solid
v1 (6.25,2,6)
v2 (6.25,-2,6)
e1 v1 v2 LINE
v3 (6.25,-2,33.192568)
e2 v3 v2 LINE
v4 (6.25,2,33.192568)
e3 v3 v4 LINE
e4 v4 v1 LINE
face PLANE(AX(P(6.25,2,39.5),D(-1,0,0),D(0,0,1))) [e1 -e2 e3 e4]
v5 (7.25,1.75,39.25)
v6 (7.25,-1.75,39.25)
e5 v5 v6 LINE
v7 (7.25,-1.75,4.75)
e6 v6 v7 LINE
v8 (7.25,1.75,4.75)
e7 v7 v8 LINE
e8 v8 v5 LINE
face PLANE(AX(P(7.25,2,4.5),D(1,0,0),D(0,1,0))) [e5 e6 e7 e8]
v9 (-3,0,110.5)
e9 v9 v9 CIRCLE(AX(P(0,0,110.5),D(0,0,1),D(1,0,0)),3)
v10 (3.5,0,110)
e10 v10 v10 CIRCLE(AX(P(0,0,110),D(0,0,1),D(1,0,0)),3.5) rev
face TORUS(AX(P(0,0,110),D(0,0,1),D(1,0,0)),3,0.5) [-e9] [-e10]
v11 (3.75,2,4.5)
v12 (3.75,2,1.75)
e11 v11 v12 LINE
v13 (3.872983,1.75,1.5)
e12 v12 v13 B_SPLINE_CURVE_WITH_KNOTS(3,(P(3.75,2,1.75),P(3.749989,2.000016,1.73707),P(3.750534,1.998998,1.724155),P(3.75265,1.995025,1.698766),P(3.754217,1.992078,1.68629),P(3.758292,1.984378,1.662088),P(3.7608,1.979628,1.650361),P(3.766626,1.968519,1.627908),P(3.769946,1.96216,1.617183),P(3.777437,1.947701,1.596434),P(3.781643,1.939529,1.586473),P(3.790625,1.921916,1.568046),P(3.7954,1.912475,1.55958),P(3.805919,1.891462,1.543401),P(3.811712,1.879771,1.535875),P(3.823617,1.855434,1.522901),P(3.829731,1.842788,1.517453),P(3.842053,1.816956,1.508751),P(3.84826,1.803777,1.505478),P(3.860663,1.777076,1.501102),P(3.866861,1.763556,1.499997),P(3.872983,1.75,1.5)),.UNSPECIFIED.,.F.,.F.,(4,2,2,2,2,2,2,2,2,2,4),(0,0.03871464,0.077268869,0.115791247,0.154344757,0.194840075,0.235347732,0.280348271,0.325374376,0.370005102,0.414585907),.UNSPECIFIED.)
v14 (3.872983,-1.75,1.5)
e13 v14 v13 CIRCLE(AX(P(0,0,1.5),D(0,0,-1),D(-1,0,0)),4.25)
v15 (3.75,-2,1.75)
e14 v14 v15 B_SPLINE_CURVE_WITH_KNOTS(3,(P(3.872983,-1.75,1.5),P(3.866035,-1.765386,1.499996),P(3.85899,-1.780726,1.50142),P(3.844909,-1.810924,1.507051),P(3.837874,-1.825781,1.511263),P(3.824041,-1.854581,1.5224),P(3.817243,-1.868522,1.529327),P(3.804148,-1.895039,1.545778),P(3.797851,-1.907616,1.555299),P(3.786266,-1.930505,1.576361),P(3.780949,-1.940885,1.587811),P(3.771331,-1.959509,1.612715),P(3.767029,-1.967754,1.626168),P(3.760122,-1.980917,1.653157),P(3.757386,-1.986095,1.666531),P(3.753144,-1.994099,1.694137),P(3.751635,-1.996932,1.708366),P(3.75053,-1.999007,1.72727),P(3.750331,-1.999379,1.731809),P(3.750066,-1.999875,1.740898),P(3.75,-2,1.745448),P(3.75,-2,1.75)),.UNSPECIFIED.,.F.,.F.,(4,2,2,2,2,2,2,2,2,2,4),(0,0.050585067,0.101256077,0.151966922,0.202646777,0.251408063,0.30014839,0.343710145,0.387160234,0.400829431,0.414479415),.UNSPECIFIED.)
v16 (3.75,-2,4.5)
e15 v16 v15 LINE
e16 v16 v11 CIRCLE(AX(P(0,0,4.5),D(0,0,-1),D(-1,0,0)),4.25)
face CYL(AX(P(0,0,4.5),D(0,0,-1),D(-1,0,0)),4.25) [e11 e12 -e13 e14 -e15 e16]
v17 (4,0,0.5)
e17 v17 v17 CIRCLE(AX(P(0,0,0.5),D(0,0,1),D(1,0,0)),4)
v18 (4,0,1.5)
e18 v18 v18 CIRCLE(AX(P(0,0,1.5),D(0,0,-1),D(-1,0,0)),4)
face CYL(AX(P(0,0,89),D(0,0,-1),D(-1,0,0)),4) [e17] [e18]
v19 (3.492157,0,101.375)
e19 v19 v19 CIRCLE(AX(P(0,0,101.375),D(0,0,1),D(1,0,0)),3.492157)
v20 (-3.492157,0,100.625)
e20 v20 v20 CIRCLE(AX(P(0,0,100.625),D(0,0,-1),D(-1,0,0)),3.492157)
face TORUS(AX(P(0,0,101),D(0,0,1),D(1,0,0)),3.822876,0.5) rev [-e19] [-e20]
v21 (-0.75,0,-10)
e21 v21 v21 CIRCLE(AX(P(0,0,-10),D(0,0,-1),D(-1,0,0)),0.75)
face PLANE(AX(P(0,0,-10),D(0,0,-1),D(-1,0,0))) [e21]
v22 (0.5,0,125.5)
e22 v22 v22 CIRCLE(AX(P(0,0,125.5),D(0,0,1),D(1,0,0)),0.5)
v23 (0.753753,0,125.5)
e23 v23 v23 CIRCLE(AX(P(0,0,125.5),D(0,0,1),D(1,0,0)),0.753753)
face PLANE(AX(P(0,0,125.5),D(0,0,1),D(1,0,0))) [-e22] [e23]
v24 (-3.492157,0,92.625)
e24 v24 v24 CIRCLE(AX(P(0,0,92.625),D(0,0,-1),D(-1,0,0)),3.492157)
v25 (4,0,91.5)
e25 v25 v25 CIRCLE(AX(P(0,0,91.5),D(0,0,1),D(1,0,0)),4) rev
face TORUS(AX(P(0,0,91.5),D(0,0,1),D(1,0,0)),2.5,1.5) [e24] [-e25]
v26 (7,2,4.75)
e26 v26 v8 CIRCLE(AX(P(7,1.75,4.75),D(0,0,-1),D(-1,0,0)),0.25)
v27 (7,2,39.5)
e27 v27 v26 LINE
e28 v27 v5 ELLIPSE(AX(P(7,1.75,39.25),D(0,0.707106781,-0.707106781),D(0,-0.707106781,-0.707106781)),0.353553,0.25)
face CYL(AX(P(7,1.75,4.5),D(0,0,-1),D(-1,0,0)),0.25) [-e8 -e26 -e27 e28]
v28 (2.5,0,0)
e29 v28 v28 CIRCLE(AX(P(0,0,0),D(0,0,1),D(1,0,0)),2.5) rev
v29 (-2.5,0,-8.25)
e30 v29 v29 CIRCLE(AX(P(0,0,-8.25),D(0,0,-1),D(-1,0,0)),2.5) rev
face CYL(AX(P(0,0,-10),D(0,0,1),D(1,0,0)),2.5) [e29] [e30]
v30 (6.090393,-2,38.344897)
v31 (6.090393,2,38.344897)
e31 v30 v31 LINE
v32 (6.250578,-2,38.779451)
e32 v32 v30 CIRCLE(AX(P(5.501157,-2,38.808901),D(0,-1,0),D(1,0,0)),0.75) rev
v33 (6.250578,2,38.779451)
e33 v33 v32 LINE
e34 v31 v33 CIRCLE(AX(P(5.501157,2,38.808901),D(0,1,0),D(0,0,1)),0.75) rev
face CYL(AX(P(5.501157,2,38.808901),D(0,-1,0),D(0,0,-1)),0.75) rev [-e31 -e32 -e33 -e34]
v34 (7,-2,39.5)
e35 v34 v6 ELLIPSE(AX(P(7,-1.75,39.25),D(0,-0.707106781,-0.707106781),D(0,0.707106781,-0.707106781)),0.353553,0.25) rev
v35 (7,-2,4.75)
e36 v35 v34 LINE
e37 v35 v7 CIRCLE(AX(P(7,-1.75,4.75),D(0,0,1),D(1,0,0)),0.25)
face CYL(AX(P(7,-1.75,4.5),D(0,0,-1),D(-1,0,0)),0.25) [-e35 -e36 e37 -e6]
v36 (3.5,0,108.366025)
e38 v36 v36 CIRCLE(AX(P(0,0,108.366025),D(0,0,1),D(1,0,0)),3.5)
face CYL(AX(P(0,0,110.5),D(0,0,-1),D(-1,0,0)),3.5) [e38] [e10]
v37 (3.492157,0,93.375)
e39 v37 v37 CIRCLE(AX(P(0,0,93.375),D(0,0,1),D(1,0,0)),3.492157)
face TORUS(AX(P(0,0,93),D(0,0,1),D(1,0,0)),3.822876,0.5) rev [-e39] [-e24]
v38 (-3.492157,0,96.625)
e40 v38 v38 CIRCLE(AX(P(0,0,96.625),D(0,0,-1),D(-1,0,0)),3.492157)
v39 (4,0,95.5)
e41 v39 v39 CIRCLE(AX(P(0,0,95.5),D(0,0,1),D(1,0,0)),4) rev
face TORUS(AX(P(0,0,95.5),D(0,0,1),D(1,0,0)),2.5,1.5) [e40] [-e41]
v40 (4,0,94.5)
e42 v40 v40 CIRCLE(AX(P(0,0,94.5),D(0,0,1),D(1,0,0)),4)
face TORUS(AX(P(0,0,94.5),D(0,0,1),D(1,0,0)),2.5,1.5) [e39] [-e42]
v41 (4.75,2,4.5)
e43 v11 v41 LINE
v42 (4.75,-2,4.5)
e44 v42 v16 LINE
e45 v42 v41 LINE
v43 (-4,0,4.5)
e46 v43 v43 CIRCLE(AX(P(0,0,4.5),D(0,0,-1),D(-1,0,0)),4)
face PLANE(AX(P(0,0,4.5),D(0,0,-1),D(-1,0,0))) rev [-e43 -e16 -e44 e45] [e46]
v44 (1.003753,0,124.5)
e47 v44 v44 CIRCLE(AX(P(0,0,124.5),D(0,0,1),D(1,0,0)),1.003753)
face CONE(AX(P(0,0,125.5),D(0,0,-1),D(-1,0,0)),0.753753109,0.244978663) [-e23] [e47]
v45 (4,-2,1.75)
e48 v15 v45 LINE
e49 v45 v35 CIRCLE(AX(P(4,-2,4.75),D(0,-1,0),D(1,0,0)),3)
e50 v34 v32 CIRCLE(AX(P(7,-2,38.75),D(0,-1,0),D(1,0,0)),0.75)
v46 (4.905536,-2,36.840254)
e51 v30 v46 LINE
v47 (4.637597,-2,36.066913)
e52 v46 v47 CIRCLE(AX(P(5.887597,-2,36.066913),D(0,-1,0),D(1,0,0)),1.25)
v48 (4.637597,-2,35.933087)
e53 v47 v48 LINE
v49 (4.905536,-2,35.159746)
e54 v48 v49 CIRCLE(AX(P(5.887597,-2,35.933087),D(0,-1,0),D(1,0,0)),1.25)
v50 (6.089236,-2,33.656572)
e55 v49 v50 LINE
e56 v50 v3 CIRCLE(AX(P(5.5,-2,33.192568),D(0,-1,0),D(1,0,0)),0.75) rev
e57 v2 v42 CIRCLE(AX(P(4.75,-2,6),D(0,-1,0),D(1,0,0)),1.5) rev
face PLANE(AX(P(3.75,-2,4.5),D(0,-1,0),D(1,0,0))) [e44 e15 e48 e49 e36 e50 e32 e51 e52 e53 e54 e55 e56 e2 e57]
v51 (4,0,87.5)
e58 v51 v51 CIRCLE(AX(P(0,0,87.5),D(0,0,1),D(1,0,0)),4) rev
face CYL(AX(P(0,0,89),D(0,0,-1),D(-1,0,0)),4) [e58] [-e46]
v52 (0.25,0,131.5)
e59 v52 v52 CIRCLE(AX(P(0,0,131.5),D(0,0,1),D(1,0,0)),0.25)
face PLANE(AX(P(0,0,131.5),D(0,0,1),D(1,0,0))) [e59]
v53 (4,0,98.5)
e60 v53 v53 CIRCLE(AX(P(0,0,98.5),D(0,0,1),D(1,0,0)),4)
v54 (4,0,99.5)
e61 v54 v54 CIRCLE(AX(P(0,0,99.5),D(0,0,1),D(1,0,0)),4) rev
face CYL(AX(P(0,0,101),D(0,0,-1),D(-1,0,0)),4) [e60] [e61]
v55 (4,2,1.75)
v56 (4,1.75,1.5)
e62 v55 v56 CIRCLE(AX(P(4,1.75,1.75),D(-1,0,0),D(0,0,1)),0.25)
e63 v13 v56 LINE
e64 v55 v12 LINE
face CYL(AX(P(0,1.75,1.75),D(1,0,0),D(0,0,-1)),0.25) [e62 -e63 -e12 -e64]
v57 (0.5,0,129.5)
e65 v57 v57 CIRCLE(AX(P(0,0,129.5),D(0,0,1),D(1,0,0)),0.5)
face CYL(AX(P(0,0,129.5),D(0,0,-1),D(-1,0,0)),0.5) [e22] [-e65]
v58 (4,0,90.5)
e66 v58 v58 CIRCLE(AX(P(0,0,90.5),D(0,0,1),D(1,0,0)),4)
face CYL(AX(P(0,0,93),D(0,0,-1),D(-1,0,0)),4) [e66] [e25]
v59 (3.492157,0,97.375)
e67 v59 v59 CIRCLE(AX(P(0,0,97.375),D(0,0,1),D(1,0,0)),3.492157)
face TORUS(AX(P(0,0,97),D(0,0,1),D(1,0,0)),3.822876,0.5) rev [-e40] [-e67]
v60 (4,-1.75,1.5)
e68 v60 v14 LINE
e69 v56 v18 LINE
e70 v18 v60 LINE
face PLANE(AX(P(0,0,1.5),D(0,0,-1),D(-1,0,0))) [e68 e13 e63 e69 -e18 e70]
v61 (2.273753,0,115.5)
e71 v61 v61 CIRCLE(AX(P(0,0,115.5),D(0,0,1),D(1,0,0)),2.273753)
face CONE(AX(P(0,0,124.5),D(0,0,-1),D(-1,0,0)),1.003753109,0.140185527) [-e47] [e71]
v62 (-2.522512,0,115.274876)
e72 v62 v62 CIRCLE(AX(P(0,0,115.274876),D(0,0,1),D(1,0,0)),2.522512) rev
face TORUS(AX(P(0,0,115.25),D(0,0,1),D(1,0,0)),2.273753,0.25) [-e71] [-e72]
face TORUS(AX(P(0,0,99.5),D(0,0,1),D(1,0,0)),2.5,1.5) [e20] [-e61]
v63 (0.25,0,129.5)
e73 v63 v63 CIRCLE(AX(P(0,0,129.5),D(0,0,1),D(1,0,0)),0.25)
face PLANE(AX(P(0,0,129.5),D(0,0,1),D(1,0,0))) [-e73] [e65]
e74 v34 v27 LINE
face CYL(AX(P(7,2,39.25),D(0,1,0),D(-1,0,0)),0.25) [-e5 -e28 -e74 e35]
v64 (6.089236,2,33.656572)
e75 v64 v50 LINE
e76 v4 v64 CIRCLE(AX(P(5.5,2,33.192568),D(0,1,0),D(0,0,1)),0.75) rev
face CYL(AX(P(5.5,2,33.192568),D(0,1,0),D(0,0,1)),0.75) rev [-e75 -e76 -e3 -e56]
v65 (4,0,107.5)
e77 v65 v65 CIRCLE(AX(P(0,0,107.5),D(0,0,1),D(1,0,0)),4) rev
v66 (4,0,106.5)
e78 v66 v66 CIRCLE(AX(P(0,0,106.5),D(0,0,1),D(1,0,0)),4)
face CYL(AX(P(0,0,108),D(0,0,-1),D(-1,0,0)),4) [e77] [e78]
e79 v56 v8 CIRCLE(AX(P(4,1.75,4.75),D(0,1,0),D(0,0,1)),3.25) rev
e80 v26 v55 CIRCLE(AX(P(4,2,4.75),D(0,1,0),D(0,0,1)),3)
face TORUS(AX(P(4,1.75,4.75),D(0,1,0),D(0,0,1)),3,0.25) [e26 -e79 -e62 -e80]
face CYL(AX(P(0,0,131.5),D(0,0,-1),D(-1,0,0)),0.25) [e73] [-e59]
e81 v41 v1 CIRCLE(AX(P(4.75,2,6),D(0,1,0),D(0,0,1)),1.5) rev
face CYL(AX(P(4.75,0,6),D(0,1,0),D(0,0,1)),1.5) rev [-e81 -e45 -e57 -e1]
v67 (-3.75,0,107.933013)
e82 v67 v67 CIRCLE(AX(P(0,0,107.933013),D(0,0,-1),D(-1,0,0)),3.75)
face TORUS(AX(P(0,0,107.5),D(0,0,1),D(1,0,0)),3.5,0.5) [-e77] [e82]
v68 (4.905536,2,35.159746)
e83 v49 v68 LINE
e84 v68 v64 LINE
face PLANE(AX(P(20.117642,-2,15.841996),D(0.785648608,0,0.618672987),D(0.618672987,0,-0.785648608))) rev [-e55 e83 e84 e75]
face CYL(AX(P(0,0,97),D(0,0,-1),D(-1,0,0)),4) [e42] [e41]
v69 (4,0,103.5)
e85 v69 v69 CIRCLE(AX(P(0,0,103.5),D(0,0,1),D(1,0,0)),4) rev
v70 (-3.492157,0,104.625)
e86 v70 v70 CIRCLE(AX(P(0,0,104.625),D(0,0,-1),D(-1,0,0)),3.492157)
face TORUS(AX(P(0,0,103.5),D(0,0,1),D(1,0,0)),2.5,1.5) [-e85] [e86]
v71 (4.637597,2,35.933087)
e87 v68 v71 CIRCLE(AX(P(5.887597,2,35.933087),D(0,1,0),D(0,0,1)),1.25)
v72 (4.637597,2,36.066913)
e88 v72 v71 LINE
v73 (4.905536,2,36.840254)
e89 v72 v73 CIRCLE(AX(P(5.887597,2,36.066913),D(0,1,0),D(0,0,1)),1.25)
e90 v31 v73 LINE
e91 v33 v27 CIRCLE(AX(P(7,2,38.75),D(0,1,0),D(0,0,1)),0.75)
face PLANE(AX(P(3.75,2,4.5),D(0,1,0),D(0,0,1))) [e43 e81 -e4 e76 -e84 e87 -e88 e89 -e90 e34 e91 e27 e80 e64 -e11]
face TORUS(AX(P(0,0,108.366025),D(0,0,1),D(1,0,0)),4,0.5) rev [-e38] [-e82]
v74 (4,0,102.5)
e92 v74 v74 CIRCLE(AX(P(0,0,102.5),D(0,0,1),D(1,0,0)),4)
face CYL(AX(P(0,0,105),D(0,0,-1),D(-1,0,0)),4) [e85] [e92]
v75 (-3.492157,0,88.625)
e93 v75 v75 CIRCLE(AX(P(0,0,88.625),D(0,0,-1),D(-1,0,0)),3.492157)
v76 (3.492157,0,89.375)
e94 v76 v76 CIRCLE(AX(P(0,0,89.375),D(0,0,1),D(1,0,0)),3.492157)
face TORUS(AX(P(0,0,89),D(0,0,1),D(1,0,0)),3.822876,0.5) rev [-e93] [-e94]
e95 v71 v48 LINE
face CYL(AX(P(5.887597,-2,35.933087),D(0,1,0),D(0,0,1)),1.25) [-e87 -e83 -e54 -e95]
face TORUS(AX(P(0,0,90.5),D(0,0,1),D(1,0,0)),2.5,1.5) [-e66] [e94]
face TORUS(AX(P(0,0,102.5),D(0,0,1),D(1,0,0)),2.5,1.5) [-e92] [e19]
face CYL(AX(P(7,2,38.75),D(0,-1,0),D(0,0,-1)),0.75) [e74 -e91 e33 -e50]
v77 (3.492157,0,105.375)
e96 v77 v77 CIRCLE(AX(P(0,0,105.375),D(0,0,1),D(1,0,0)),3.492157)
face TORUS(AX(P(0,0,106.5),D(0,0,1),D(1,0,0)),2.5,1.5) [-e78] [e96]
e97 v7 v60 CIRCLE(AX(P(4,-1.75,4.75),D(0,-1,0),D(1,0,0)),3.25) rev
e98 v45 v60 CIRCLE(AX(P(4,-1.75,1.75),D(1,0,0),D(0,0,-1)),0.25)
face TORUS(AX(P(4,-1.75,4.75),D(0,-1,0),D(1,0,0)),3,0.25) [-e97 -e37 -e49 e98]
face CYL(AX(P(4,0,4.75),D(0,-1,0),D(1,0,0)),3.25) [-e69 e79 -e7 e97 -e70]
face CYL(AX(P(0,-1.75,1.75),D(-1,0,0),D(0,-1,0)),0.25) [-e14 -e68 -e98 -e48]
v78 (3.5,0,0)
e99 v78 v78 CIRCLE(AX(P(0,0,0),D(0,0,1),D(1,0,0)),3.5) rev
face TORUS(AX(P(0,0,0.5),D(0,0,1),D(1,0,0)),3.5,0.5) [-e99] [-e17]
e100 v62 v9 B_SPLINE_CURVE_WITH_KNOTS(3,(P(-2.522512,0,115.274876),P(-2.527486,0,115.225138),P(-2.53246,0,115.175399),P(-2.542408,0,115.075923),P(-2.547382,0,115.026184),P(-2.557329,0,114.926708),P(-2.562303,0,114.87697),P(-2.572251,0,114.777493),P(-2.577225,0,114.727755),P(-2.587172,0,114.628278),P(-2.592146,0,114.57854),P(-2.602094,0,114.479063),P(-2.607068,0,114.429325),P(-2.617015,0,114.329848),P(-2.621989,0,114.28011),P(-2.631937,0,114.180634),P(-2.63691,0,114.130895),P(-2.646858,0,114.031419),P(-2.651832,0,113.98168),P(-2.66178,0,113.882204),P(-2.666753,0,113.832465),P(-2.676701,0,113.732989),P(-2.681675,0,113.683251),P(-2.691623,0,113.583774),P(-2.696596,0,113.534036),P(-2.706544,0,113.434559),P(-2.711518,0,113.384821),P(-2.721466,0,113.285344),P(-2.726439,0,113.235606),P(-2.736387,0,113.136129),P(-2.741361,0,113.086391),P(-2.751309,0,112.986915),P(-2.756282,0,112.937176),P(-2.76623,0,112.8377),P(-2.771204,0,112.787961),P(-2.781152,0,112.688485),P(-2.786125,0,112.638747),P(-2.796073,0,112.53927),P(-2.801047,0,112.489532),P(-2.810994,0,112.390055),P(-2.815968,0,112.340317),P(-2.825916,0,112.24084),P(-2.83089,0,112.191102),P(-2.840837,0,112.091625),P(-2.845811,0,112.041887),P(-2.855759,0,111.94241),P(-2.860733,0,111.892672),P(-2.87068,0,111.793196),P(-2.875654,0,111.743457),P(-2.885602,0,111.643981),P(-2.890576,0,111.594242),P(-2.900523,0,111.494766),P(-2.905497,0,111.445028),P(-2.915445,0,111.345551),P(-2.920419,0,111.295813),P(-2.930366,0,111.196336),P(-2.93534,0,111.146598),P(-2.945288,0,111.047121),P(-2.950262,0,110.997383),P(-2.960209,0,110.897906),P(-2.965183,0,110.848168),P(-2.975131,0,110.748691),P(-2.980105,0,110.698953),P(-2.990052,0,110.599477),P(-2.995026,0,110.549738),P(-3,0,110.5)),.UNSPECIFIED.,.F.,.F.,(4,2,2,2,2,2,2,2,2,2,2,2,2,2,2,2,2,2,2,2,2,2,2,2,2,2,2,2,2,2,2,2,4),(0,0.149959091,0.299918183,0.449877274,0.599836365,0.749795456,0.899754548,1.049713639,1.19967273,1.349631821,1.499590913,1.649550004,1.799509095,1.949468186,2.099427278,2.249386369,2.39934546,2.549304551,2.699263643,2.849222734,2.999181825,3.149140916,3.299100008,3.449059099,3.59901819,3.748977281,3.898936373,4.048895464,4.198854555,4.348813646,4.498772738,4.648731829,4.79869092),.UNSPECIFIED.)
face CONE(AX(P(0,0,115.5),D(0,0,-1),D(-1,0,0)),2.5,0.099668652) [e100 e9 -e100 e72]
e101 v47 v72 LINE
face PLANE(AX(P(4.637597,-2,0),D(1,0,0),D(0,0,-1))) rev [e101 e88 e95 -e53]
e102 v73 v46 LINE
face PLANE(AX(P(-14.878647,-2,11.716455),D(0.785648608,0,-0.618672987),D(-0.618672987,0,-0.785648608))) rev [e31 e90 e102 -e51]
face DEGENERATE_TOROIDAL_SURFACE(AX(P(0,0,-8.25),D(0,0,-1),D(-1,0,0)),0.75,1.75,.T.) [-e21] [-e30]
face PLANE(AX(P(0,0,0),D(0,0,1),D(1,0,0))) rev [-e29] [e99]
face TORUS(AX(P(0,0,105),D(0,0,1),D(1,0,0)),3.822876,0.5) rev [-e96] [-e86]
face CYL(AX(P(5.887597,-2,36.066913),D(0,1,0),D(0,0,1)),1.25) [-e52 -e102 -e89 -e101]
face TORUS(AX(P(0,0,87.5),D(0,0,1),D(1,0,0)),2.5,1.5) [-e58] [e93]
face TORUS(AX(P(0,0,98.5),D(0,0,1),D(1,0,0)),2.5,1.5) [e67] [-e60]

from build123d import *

# Parameters (mm, degrees)
SKETCH1_R            = 4
BOSS_EXTRUDE1_DEPTH  = 89
FILLET2_R            = 0.5
FILLET3_R            = 1.5
SKETCH2_R            = 4
BOSS_EXTRUDE2_DEPTH  = 4
FILLET4_R            = 1.5
FILLET5_R            = 1.5
SKETCH3_R            = 4
BOSS_EXTRUDE3_DEPTH  = 4
FILLET6_R            = 1.5
SKETCH4_R            = 4
BOSS_EXTRUDE4_DEPTH  = 4
FILLET7_R            = 1.5
SKETCH5_R            = 4
BOSS_EXTRUDE5_DEPTH  = 4
FILLET8_R            = 1.5
FILLET9_R            = 1.5
FILLET10_R           = 1.5
FILLET11_R           = 1.5
SKETCH6_R            = 4
BOSS_EXTRUDE6_DEPTH  = 3
FILLET12_R           = 1.5
FILLET13_R           = 0.5
FILLET14_R           = 0.5
FILLET15_R           = 0.5
SKETCH7_R            = 3.5
BOSS_EXTRUDE7_DEPTH  = 2.5
FILLET16_R           = 0.5
FILLET17_R           = 0.5
SKETCH8_R            = 3
BOSS_EXTRUDE8_DEPTH  = 5
CHAMFER1_SIZE2       = 0.5
CHAMFER1_SIZE        = 5
FILLET18_R           = 0.25
SKETCH10_R           = 2.273753109
BOSS_EXTRUDE9_DEPTH  = 9
CHAMFER2_SIZE2       = 1.27
CHAMFER2_SIZE        = 9
SKETCH13_R           = 1.003753109
BOSS_EXTRUDE10_DEPTH = 1
CHAMFER3_SIZE2       = 0.25
CHAMFER3_SIZE        = 1
SKETCH14_R           = 0.5
BOSS_EXTRUDE11_DEPTH = 4
SKETCH15_R           = 0.25
BOSS_EXTRUDE13_DEPTH = 2
SKETCH16_R           = 4.25
BOSS_EXTRUDE14_DEPTH = 3
SKETCH17_R           = 2.5
BOSS_EXTRUDE15_DEPTH = 10
SKETCH18_W           = 3.5
SKETCH18_H           = 4
BOSS_EXTRUDE16_DEPTH = 3
SKETCH19_W           = 1
SKETCH19_H           = 4
BOSS_EXTRUDE17_DEPTH = 38
FILLET20_R           = 3.25
FILLET21_R           = 1.75
FILLET22_R           = 1.5
FILLET23_R           = 0.25
BOSS_EXTRUDE20_DEPTH = 4
FILLET24_R           = 0.75
FILLET25_R           = 0.75
FILLET26_R           = 0.75
FILLET28_R           = 1.25
FILLET29_R           = 1.25


# Some blends are built 0.0001 mm under size
with BuildPart() as part:
    # Sketch1 → Boss-Extrude1 (new body)
    with BuildSketch(Plane.XY):
        Circle(SKETCH1_R)
    extrude(amount=BOSS_EXTRUDE1_DEPTH)

    # Fillet2
    fillet2_edges = [part.edges().sort_by_distance(p)[0] for p in [
        (-4, 0, 0),
    ]]
    fillet(fillet2_edges, radius=FILLET2_R)

    # Fillet3
    fillet3_edges = [part.edges().sort_by_distance(p)[0] for p in [
        (-4, 0, 89),
    ]]
    fillet(fillet3_edges, radius=FILLET3_R)

    # Sketch2 → Boss-Extrude2 (add)
    with BuildSketch(Plane.XY.offset(89)):
        Circle(SKETCH2_R)
    extrude(amount=BOSS_EXTRUDE2_DEPTH)

    # Fillet4
    fillet4_edges = [part.edges().sort_by_distance(p)[0] for p in [
        (-4, 0, 89),
    ]]
    fillet(fillet4_edges, radius=FILLET4_R - 0.0001)  # a hair under: the kernel refuses the full size

    # Fillet5
    fillet5_edges = [part.edges().sort_by_distance(p)[0] for p in [
        (-4, 0, 93),
    ]]
    fillet(fillet5_edges, radius=FILLET5_R)

    # Sketch3 → Boss-Extrude3 (add)
    with BuildSketch(Plane.XY.offset(93)):
        Circle(SKETCH3_R)
    extrude(amount=BOSS_EXTRUDE3_DEPTH)

    # Fillet6
    fillet6_edges = [part.edges().sort_by_distance(p)[0] for p in [
        (-4, 0, 97),
    ]]
    fillet(fillet6_edges, radius=FILLET6_R)

    # Sketch4 → Boss-Extrude4 (add)
    with BuildSketch(Plane.XY.offset(97)):
        Circle(SKETCH4_R)
    extrude(amount=BOSS_EXTRUDE4_DEPTH)

    # Fillet7
    fillet7_edges = [part.edges().sort_by_distance(p)[0] for p in [
        (-4, 0, 101),
    ]]
    fillet(fillet7_edges, radius=FILLET7_R)

    # Sketch5 → Boss-Extrude5 (add)
    with BuildSketch(Plane.XY.offset(101)):
        Circle(SKETCH5_R)
    extrude(amount=BOSS_EXTRUDE5_DEPTH)

    # Fillet8
    fillet8_edges = [part.edges().sort_by_distance(p)[0] for p in [
        (-4, 0, 93),
    ]]
    fillet(fillet8_edges, radius=FILLET8_R - 0.0001)  # a hair under: the kernel refuses the full size

    # Fillet9
    fillet9_edges = [part.edges().sort_by_distance(p)[0] for p in [
        (-4, 0, 97),
    ]]
    fillet(fillet9_edges, radius=FILLET9_R - 0.0001)  # a hair under: the kernel refuses the full size

    # Fillet10
    fillet10_edges = [part.edges().sort_by_distance(p)[0] for p in [
        (-4, 0, 101),
    ]]
    fillet(fillet10_edges, radius=FILLET10_R - 0.0001)  # a hair under: the kernel refuses the full size

    # Fillet11
    fillet11_edges = [part.edges().sort_by_distance(p)[0] for p in [
        (-4, 0, 105),
    ]]
    fillet(fillet11_edges, radius=FILLET11_R)

    # Sketch6 → Boss-Extrude6 (add)
    with BuildSketch(Plane.XY.offset(105)):
        Circle(SKETCH6_R)
    extrude(amount=BOSS_EXTRUDE6_DEPTH)

    # Fillet12
    fillet12_edges = [part.edges().sort_by_distance(p)[0] for p in [
        (-4, 0, 105),
    ]]
    fillet(fillet12_edges, radius=FILLET12_R - 0.0001)  # a hair under: the kernel refuses the full size

    # Fillet13
    # the kernel refuses this fillet: 0.5 mm, written as the material it adds along each edge
    with BuildSketch(Plane(origin=(0, 0, 105), x_dir=(1, 0, 0), z_dir=(0, -1, 0))) as fillet13_piece_1:
        with BuildLine():
            CenterArc((3.822906757, -2.7429e-05), FILLET13_R, 131.40951688, 97.179673012)
            Line((3.492180068, -0.375020572), (3.459107399, -0.412519886))
            ThreePointArc((3.459107399, -0.412519886), (3.012666478, -0.143654512), (2.5, -0.05))
            Line((2.5, -0.05), (2.5, 0.05))
            ThreePointArc((2.5, 0.05), (2.5001, 0.05), (3.459116709, 0.412473239))
            Line((3.459116709, 0.412473239), (3.492188532, 0.374973178))
        make_face()
    revolve(axis=Axis((0, 0, 105), (0, 0, 1)))

    # Fillet14
    # the kernel refuses this fillet: 0.5 mm, written as the material it adds along each edge
    with BuildSketch(Plane(origin=(0, 0, 93), x_dir=(1, 0, 0), z_dir=(0, -1, 0))) as fillet14_piece_1:
        with BuildLine():
            CenterArc((3.822906757, -2.7429e-05), FILLET14_R, 131.40951688, 97.179673012)
            Line((3.492180068, -0.375020572), (3.459107399, -0.412519886))
            ThreePointArc((3.459107399, -0.412519886), (3.012666478, -0.143654512), (2.5, -0.05))
            Line((2.5, -0.05), (2.5, 0.05))
            ThreePointArc((2.5, 0.05), (2.5001, 0.05), (3.459116709, 0.412473239))
            Line((3.459116709, 0.412473239), (3.492188532, 0.374973178))
        make_face()
    revolve(axis=Axis((0, 0, 93), (0, 0, 1)))
    with BuildSketch(Plane(origin=(0, 0, 97), x_dir=(1, 0, 0), z_dir=(0, -1, 0))) as fillet14_piece_2:
        with BuildLine():
            CenterArc((3.822906757, -2.7429e-05), FILLET14_R, 131.40951688, 97.179673012)
            Line((3.492180068, -0.375020572), (3.459107399, -0.412519886))
            ThreePointArc((3.459107399, -0.412519886), (3.012666478, -0.143654512), (2.5, -0.05))
            Line((2.5, -0.05), (2.5, 0.05))
            ThreePointArc((2.5, 0.05), (2.5001, 0.05), (3.459116709, 0.412473239))
            Line((3.459116709, 0.412473239), (3.492188532, 0.374973178))
        make_face()
    revolve(axis=Axis((0, 0, 97), (0, 0, 1)))
    with BuildSketch(Plane(origin=(0, 0, 101), x_dir=(1, 0, 0), z_dir=(0, -1, 0))) as fillet14_piece_3:
        with BuildLine():
            CenterArc((3.822906757, -2.7429e-05), FILLET14_R, 131.40951688, 97.179673012)
            Line((3.492180068, -0.375020572), (3.459107399, -0.412519886))
            ThreePointArc((3.459107399, -0.412519886), (3.012666478, -0.143654512), (2.5, -0.05))
            Line((2.5, -0.05), (2.5, 0.05))
            ThreePointArc((2.5, 0.05), (2.5001, 0.05), (3.459116709, 0.412473239))
            Line((3.459116709, 0.412473239), (3.492188532, 0.374973178))
        make_face()
    revolve(axis=Axis((0, 0, 101), (0, 0, 1)))
    with BuildSketch(Plane(origin=(0, 0, 89), x_dir=(1, 0, 0), z_dir=(0, -1, 0))) as fillet14_piece_4:
        with BuildLine():
            CenterArc((3.822906757, -2.7429e-05), FILLET14_R, 131.40951688, 97.179673012)
            Line((3.492180068, -0.375020572), (3.459107399, -0.412519886))
            ThreePointArc((3.459107399, -0.412519886), (3.012666478, -0.143654512), (2.5, -0.05))
            Line((2.5, -0.05), (2.5, 0.05))
            ThreePointArc((2.5, 0.05), (2.5001, 0.05), (3.459116709, 0.412473239))
            Line((3.459116709, 0.412473239), (3.492188532, 0.374973178))
        make_face()
    revolve(axis=Axis((0, 0, 89), (0, 0, 1)))

    # Fillet15
    fillet15_edges = [part.edges().sort_by_distance(p)[0] for p in [
        (-4, 0, 108),
    ]]
    fillet(fillet15_edges, radius=FILLET15_R)

    # Sketch7 → Boss-Extrude7 (add)
    with BuildSketch(Plane.XY.offset(108)):
        Circle(SKETCH7_R)
    extrude(amount=BOSS_EXTRUDE7_DEPTH)

    # Fillet16
    fillet16_edges = [part.edges().sort_by_distance(p)[0] for p in [
        (-3.5, 0, 108),
    ]]
    fillet(fillet16_edges, radius=FILLET16_R)

    # Fillet17
    fillet17_edges = [part.edges().sort_by_distance(p)[0] for p in [
        (-3.5, 0, 110.5),
    ]]
    fillet(fillet17_edges, radius=FILLET17_R)

    # Sketch8 → Boss-Extrude8 (add)
    with BuildSketch(Plane.XY.offset(110.5)):
        Circle(SKETCH8_R)
    extrude(amount=BOSS_EXTRUDE8_DEPTH)

    # Chamfer1
    chamfer1_edges = [part.edges().sort_by_distance(p)[0] for p in [
        (-3, 0, 115.5),
    ]]
    chamfer1_side = [part.faces().sort_by_distance(p)[0] for p in [
        (-3, 0, 115.49),
    ]]
    chamfer(chamfer1_edges, length=CHAMFER1_SIZE - 0.0001, length2=CHAMFER1_SIZE2 - 0.0001, reference=chamfer1_side[0])  # a hair under: the kernel refuses the full size

    # Fillet18
    fillet18_edges = [part.edges().sort_by_distance(p)[0] for p in [
        (-2.5001, 0, 115.5),
    ]]
    fillet(fillet18_edges, radius=FILLET18_R)

    # Sketch10 → Boss-Extrude9 (add)
    with BuildSketch(Plane.XY.offset(115.5)):
        Circle(SKETCH10_R)
    extrude(amount=BOSS_EXTRUDE9_DEPTH)

    # Chamfer2
    chamfer2_edges = [part.edges().sort_by_distance(p)[0] for p in [
        (-2.273753109, 0, 124.5),
    ]]
    chamfer2_side = [part.faces().sort_by_distance(p)[0] for p in [
        (-2.273753109, 0, 124.4746),
    ]]
    chamfer(chamfer2_edges, length=CHAMFER2_SIZE - 0.0001, length2=CHAMFER2_SIZE2 - 0.0001, reference=chamfer2_side[0])  # a hair under: the kernel refuses the full size

    # Sketch13 → Boss-Extrude10 (add)
    with BuildSketch(Plane.XY.offset(124.5)):
        Circle(SKETCH13_R)
    extrude(amount=BOSS_EXTRUDE10_DEPTH)

    # Chamfer3
    chamfer3_edges = [part.edges().sort_by_distance(p)[0] for p in [
        (-1.003753109, 0, 125.5),
    ]]
    chamfer3_side = [part.faces().sort_by_distance(p)[0] for p in [
        (-1.003753109, 0, 125.495),
    ]]
    chamfer(chamfer3_edges, length=CHAMFER3_SIZE - 0.0001, length2=CHAMFER3_SIZE2 - 0.0001, reference=chamfer3_side[0])  # a hair under: the kernel refuses the full size

    # Sketch14 → Boss-Extrude11 (add)
    with BuildSketch(Plane.XY.offset(125.5)):
        Circle(SKETCH14_R)
    extrude(amount=BOSS_EXTRUDE11_DEPTH)

    # Sketch15 → Boss-Extrude13 (add)
    with BuildSketch(Plane.XY.offset(129.5)):
        Circle(SKETCH15_R)
    extrude(amount=BOSS_EXTRUDE13_DEPTH)

    # Sketch16 → Boss-Extrude14 (add)
    with BuildSketch(Plane(origin=(0, 0, 1.5), x_dir=(-1, 0, 0), z_dir=(0, 0, -1))):
        Circle(SKETCH16_R)
    extrude(amount=-BOSS_EXTRUDE14_DEPTH)

    # Sketch17 → Boss-Extrude15 (add)
    with BuildSketch(Plane(origin=(0, 0, 0), x_dir=(-1, 0, 0), z_dir=(0, 0, -1))):
        with Locations(Location((0, 0, 0), (0, 0, 180))):
            Circle(SKETCH17_R)
    extrude(amount=BOSS_EXTRUDE15_DEPTH)

    # Sketch18 → Boss-Extrude16 (add)
    with BuildSketch(Plane(origin=(0, 0, 1.5), x_dir=(-1, 0, 0), z_dir=(0, 0, -1))):
        with Locations((-5.5, 0)):
            Rectangle(SKETCH18_W, SKETCH18_H)
    extrude(amount=-BOSS_EXTRUDE16_DEPTH)

    # Sketch19 → Boss-Extrude17 (add)
    with BuildSketch(Plane(origin=(0, 0, 1.5), x_dir=(-1, 0, 0), z_dir=(0, 0, -1))):
        with Locations((-6.75, 0)):
            Rectangle(SKETCH19_W, SKETCH19_H)
    extrude(amount=-BOSS_EXTRUDE17_DEPTH)

    # Fillet20
    fillet20_edges = [part.edges().sort_by_distance(p)[0] for p in [
        (7.25, 0, 1.5),
    ]]
    fillet(fillet20_edges, radius=FILLET20_R - 0.0001)  # a hair under: the kernel refuses the full size

    # Fillet21
    fillet21_edges = [part.edges().sort_by_distance(p)[0] for p in [
        (-2.5, 0, -10),
    ]]
    fillet(fillet21_edges, radius=FILLET21_R)

    # Fillet22
    fillet22_edges = [part.edges().sort_by_distance(p)[0] for p in [
        (6.25, 0, 4.5),
    ]]
    fillet(fillet22_edges, radius=FILLET22_R)

    # Fillet23
    fillet23_edges = [part.edges().sort_by_distance(p)[0] for p in [
        (3.87505, 2, 1.5),
        (7.25, -2, 22.12495),
        (7.25, 2, 22.12495),
        (7.25, 0, 39.5),
        (3.87505, -2, 1.5),
        (6.298126328, -2, 2.451873672),
        (6.298126328, 2, 2.451873672),
    ]]
    fillet(fillet23_edges, radius=FILLET23_R)

    # Sketch20 → Boss-Extrude20 (add)
    with BuildSketch(Plane(origin=(0, 2, 0), x_dir=(1, 0, 0), z_dir=(0, 1, 0))):
        Polygon((6.25, -38.547580114), (6.25, -33.452419886), (4.637596576, -35.5), (4.637596576, -36.5), align=None)
    extrude(amount=-BOSS_EXTRUDE20_DEPTH)

    # Fillet24
    fillet24_edges = [part.edges().sort_by_distance(p)[0] for p in [
        (6.25, 0, 39.5),
    ]]
    fillet(fillet24_edges, radius=FILLET24_R - 0.0001)  # a hair under: the kernel refuses the full size

    # Fillet25
    fillet25_edges = [part.edges().sort_by_distance(p)[0] for p in [
        (6.25, 0, 38.547580114),
    ]]
    fillet(fillet25_edges, radius=FILLET25_R)

    # Fillet26
    fillet26_edges = [part.edges().sort_by_distance(p)[0] for p in [
        (6.25, 0, 33.452419886),
    ]]
    fillet(fillet26_edges, radius=FILLET26_R)

    # Fillet28
    fillet28_edges = [part.edges().sort_by_distance(p)[0] for p in [
        (4.637596576, 0, 36.5),
    ]]
    fillet(fillet28_edges, radius=FILLET28_R)

    # Fillet29
    fillet29_edges = [part.edges().sort_by_distance(p)[0] for p in [
        (4.637596576, 0, 35.5),
    ]]
    fillet(fillet29_edges, radius=FILLET29_R)


solid = part.part
